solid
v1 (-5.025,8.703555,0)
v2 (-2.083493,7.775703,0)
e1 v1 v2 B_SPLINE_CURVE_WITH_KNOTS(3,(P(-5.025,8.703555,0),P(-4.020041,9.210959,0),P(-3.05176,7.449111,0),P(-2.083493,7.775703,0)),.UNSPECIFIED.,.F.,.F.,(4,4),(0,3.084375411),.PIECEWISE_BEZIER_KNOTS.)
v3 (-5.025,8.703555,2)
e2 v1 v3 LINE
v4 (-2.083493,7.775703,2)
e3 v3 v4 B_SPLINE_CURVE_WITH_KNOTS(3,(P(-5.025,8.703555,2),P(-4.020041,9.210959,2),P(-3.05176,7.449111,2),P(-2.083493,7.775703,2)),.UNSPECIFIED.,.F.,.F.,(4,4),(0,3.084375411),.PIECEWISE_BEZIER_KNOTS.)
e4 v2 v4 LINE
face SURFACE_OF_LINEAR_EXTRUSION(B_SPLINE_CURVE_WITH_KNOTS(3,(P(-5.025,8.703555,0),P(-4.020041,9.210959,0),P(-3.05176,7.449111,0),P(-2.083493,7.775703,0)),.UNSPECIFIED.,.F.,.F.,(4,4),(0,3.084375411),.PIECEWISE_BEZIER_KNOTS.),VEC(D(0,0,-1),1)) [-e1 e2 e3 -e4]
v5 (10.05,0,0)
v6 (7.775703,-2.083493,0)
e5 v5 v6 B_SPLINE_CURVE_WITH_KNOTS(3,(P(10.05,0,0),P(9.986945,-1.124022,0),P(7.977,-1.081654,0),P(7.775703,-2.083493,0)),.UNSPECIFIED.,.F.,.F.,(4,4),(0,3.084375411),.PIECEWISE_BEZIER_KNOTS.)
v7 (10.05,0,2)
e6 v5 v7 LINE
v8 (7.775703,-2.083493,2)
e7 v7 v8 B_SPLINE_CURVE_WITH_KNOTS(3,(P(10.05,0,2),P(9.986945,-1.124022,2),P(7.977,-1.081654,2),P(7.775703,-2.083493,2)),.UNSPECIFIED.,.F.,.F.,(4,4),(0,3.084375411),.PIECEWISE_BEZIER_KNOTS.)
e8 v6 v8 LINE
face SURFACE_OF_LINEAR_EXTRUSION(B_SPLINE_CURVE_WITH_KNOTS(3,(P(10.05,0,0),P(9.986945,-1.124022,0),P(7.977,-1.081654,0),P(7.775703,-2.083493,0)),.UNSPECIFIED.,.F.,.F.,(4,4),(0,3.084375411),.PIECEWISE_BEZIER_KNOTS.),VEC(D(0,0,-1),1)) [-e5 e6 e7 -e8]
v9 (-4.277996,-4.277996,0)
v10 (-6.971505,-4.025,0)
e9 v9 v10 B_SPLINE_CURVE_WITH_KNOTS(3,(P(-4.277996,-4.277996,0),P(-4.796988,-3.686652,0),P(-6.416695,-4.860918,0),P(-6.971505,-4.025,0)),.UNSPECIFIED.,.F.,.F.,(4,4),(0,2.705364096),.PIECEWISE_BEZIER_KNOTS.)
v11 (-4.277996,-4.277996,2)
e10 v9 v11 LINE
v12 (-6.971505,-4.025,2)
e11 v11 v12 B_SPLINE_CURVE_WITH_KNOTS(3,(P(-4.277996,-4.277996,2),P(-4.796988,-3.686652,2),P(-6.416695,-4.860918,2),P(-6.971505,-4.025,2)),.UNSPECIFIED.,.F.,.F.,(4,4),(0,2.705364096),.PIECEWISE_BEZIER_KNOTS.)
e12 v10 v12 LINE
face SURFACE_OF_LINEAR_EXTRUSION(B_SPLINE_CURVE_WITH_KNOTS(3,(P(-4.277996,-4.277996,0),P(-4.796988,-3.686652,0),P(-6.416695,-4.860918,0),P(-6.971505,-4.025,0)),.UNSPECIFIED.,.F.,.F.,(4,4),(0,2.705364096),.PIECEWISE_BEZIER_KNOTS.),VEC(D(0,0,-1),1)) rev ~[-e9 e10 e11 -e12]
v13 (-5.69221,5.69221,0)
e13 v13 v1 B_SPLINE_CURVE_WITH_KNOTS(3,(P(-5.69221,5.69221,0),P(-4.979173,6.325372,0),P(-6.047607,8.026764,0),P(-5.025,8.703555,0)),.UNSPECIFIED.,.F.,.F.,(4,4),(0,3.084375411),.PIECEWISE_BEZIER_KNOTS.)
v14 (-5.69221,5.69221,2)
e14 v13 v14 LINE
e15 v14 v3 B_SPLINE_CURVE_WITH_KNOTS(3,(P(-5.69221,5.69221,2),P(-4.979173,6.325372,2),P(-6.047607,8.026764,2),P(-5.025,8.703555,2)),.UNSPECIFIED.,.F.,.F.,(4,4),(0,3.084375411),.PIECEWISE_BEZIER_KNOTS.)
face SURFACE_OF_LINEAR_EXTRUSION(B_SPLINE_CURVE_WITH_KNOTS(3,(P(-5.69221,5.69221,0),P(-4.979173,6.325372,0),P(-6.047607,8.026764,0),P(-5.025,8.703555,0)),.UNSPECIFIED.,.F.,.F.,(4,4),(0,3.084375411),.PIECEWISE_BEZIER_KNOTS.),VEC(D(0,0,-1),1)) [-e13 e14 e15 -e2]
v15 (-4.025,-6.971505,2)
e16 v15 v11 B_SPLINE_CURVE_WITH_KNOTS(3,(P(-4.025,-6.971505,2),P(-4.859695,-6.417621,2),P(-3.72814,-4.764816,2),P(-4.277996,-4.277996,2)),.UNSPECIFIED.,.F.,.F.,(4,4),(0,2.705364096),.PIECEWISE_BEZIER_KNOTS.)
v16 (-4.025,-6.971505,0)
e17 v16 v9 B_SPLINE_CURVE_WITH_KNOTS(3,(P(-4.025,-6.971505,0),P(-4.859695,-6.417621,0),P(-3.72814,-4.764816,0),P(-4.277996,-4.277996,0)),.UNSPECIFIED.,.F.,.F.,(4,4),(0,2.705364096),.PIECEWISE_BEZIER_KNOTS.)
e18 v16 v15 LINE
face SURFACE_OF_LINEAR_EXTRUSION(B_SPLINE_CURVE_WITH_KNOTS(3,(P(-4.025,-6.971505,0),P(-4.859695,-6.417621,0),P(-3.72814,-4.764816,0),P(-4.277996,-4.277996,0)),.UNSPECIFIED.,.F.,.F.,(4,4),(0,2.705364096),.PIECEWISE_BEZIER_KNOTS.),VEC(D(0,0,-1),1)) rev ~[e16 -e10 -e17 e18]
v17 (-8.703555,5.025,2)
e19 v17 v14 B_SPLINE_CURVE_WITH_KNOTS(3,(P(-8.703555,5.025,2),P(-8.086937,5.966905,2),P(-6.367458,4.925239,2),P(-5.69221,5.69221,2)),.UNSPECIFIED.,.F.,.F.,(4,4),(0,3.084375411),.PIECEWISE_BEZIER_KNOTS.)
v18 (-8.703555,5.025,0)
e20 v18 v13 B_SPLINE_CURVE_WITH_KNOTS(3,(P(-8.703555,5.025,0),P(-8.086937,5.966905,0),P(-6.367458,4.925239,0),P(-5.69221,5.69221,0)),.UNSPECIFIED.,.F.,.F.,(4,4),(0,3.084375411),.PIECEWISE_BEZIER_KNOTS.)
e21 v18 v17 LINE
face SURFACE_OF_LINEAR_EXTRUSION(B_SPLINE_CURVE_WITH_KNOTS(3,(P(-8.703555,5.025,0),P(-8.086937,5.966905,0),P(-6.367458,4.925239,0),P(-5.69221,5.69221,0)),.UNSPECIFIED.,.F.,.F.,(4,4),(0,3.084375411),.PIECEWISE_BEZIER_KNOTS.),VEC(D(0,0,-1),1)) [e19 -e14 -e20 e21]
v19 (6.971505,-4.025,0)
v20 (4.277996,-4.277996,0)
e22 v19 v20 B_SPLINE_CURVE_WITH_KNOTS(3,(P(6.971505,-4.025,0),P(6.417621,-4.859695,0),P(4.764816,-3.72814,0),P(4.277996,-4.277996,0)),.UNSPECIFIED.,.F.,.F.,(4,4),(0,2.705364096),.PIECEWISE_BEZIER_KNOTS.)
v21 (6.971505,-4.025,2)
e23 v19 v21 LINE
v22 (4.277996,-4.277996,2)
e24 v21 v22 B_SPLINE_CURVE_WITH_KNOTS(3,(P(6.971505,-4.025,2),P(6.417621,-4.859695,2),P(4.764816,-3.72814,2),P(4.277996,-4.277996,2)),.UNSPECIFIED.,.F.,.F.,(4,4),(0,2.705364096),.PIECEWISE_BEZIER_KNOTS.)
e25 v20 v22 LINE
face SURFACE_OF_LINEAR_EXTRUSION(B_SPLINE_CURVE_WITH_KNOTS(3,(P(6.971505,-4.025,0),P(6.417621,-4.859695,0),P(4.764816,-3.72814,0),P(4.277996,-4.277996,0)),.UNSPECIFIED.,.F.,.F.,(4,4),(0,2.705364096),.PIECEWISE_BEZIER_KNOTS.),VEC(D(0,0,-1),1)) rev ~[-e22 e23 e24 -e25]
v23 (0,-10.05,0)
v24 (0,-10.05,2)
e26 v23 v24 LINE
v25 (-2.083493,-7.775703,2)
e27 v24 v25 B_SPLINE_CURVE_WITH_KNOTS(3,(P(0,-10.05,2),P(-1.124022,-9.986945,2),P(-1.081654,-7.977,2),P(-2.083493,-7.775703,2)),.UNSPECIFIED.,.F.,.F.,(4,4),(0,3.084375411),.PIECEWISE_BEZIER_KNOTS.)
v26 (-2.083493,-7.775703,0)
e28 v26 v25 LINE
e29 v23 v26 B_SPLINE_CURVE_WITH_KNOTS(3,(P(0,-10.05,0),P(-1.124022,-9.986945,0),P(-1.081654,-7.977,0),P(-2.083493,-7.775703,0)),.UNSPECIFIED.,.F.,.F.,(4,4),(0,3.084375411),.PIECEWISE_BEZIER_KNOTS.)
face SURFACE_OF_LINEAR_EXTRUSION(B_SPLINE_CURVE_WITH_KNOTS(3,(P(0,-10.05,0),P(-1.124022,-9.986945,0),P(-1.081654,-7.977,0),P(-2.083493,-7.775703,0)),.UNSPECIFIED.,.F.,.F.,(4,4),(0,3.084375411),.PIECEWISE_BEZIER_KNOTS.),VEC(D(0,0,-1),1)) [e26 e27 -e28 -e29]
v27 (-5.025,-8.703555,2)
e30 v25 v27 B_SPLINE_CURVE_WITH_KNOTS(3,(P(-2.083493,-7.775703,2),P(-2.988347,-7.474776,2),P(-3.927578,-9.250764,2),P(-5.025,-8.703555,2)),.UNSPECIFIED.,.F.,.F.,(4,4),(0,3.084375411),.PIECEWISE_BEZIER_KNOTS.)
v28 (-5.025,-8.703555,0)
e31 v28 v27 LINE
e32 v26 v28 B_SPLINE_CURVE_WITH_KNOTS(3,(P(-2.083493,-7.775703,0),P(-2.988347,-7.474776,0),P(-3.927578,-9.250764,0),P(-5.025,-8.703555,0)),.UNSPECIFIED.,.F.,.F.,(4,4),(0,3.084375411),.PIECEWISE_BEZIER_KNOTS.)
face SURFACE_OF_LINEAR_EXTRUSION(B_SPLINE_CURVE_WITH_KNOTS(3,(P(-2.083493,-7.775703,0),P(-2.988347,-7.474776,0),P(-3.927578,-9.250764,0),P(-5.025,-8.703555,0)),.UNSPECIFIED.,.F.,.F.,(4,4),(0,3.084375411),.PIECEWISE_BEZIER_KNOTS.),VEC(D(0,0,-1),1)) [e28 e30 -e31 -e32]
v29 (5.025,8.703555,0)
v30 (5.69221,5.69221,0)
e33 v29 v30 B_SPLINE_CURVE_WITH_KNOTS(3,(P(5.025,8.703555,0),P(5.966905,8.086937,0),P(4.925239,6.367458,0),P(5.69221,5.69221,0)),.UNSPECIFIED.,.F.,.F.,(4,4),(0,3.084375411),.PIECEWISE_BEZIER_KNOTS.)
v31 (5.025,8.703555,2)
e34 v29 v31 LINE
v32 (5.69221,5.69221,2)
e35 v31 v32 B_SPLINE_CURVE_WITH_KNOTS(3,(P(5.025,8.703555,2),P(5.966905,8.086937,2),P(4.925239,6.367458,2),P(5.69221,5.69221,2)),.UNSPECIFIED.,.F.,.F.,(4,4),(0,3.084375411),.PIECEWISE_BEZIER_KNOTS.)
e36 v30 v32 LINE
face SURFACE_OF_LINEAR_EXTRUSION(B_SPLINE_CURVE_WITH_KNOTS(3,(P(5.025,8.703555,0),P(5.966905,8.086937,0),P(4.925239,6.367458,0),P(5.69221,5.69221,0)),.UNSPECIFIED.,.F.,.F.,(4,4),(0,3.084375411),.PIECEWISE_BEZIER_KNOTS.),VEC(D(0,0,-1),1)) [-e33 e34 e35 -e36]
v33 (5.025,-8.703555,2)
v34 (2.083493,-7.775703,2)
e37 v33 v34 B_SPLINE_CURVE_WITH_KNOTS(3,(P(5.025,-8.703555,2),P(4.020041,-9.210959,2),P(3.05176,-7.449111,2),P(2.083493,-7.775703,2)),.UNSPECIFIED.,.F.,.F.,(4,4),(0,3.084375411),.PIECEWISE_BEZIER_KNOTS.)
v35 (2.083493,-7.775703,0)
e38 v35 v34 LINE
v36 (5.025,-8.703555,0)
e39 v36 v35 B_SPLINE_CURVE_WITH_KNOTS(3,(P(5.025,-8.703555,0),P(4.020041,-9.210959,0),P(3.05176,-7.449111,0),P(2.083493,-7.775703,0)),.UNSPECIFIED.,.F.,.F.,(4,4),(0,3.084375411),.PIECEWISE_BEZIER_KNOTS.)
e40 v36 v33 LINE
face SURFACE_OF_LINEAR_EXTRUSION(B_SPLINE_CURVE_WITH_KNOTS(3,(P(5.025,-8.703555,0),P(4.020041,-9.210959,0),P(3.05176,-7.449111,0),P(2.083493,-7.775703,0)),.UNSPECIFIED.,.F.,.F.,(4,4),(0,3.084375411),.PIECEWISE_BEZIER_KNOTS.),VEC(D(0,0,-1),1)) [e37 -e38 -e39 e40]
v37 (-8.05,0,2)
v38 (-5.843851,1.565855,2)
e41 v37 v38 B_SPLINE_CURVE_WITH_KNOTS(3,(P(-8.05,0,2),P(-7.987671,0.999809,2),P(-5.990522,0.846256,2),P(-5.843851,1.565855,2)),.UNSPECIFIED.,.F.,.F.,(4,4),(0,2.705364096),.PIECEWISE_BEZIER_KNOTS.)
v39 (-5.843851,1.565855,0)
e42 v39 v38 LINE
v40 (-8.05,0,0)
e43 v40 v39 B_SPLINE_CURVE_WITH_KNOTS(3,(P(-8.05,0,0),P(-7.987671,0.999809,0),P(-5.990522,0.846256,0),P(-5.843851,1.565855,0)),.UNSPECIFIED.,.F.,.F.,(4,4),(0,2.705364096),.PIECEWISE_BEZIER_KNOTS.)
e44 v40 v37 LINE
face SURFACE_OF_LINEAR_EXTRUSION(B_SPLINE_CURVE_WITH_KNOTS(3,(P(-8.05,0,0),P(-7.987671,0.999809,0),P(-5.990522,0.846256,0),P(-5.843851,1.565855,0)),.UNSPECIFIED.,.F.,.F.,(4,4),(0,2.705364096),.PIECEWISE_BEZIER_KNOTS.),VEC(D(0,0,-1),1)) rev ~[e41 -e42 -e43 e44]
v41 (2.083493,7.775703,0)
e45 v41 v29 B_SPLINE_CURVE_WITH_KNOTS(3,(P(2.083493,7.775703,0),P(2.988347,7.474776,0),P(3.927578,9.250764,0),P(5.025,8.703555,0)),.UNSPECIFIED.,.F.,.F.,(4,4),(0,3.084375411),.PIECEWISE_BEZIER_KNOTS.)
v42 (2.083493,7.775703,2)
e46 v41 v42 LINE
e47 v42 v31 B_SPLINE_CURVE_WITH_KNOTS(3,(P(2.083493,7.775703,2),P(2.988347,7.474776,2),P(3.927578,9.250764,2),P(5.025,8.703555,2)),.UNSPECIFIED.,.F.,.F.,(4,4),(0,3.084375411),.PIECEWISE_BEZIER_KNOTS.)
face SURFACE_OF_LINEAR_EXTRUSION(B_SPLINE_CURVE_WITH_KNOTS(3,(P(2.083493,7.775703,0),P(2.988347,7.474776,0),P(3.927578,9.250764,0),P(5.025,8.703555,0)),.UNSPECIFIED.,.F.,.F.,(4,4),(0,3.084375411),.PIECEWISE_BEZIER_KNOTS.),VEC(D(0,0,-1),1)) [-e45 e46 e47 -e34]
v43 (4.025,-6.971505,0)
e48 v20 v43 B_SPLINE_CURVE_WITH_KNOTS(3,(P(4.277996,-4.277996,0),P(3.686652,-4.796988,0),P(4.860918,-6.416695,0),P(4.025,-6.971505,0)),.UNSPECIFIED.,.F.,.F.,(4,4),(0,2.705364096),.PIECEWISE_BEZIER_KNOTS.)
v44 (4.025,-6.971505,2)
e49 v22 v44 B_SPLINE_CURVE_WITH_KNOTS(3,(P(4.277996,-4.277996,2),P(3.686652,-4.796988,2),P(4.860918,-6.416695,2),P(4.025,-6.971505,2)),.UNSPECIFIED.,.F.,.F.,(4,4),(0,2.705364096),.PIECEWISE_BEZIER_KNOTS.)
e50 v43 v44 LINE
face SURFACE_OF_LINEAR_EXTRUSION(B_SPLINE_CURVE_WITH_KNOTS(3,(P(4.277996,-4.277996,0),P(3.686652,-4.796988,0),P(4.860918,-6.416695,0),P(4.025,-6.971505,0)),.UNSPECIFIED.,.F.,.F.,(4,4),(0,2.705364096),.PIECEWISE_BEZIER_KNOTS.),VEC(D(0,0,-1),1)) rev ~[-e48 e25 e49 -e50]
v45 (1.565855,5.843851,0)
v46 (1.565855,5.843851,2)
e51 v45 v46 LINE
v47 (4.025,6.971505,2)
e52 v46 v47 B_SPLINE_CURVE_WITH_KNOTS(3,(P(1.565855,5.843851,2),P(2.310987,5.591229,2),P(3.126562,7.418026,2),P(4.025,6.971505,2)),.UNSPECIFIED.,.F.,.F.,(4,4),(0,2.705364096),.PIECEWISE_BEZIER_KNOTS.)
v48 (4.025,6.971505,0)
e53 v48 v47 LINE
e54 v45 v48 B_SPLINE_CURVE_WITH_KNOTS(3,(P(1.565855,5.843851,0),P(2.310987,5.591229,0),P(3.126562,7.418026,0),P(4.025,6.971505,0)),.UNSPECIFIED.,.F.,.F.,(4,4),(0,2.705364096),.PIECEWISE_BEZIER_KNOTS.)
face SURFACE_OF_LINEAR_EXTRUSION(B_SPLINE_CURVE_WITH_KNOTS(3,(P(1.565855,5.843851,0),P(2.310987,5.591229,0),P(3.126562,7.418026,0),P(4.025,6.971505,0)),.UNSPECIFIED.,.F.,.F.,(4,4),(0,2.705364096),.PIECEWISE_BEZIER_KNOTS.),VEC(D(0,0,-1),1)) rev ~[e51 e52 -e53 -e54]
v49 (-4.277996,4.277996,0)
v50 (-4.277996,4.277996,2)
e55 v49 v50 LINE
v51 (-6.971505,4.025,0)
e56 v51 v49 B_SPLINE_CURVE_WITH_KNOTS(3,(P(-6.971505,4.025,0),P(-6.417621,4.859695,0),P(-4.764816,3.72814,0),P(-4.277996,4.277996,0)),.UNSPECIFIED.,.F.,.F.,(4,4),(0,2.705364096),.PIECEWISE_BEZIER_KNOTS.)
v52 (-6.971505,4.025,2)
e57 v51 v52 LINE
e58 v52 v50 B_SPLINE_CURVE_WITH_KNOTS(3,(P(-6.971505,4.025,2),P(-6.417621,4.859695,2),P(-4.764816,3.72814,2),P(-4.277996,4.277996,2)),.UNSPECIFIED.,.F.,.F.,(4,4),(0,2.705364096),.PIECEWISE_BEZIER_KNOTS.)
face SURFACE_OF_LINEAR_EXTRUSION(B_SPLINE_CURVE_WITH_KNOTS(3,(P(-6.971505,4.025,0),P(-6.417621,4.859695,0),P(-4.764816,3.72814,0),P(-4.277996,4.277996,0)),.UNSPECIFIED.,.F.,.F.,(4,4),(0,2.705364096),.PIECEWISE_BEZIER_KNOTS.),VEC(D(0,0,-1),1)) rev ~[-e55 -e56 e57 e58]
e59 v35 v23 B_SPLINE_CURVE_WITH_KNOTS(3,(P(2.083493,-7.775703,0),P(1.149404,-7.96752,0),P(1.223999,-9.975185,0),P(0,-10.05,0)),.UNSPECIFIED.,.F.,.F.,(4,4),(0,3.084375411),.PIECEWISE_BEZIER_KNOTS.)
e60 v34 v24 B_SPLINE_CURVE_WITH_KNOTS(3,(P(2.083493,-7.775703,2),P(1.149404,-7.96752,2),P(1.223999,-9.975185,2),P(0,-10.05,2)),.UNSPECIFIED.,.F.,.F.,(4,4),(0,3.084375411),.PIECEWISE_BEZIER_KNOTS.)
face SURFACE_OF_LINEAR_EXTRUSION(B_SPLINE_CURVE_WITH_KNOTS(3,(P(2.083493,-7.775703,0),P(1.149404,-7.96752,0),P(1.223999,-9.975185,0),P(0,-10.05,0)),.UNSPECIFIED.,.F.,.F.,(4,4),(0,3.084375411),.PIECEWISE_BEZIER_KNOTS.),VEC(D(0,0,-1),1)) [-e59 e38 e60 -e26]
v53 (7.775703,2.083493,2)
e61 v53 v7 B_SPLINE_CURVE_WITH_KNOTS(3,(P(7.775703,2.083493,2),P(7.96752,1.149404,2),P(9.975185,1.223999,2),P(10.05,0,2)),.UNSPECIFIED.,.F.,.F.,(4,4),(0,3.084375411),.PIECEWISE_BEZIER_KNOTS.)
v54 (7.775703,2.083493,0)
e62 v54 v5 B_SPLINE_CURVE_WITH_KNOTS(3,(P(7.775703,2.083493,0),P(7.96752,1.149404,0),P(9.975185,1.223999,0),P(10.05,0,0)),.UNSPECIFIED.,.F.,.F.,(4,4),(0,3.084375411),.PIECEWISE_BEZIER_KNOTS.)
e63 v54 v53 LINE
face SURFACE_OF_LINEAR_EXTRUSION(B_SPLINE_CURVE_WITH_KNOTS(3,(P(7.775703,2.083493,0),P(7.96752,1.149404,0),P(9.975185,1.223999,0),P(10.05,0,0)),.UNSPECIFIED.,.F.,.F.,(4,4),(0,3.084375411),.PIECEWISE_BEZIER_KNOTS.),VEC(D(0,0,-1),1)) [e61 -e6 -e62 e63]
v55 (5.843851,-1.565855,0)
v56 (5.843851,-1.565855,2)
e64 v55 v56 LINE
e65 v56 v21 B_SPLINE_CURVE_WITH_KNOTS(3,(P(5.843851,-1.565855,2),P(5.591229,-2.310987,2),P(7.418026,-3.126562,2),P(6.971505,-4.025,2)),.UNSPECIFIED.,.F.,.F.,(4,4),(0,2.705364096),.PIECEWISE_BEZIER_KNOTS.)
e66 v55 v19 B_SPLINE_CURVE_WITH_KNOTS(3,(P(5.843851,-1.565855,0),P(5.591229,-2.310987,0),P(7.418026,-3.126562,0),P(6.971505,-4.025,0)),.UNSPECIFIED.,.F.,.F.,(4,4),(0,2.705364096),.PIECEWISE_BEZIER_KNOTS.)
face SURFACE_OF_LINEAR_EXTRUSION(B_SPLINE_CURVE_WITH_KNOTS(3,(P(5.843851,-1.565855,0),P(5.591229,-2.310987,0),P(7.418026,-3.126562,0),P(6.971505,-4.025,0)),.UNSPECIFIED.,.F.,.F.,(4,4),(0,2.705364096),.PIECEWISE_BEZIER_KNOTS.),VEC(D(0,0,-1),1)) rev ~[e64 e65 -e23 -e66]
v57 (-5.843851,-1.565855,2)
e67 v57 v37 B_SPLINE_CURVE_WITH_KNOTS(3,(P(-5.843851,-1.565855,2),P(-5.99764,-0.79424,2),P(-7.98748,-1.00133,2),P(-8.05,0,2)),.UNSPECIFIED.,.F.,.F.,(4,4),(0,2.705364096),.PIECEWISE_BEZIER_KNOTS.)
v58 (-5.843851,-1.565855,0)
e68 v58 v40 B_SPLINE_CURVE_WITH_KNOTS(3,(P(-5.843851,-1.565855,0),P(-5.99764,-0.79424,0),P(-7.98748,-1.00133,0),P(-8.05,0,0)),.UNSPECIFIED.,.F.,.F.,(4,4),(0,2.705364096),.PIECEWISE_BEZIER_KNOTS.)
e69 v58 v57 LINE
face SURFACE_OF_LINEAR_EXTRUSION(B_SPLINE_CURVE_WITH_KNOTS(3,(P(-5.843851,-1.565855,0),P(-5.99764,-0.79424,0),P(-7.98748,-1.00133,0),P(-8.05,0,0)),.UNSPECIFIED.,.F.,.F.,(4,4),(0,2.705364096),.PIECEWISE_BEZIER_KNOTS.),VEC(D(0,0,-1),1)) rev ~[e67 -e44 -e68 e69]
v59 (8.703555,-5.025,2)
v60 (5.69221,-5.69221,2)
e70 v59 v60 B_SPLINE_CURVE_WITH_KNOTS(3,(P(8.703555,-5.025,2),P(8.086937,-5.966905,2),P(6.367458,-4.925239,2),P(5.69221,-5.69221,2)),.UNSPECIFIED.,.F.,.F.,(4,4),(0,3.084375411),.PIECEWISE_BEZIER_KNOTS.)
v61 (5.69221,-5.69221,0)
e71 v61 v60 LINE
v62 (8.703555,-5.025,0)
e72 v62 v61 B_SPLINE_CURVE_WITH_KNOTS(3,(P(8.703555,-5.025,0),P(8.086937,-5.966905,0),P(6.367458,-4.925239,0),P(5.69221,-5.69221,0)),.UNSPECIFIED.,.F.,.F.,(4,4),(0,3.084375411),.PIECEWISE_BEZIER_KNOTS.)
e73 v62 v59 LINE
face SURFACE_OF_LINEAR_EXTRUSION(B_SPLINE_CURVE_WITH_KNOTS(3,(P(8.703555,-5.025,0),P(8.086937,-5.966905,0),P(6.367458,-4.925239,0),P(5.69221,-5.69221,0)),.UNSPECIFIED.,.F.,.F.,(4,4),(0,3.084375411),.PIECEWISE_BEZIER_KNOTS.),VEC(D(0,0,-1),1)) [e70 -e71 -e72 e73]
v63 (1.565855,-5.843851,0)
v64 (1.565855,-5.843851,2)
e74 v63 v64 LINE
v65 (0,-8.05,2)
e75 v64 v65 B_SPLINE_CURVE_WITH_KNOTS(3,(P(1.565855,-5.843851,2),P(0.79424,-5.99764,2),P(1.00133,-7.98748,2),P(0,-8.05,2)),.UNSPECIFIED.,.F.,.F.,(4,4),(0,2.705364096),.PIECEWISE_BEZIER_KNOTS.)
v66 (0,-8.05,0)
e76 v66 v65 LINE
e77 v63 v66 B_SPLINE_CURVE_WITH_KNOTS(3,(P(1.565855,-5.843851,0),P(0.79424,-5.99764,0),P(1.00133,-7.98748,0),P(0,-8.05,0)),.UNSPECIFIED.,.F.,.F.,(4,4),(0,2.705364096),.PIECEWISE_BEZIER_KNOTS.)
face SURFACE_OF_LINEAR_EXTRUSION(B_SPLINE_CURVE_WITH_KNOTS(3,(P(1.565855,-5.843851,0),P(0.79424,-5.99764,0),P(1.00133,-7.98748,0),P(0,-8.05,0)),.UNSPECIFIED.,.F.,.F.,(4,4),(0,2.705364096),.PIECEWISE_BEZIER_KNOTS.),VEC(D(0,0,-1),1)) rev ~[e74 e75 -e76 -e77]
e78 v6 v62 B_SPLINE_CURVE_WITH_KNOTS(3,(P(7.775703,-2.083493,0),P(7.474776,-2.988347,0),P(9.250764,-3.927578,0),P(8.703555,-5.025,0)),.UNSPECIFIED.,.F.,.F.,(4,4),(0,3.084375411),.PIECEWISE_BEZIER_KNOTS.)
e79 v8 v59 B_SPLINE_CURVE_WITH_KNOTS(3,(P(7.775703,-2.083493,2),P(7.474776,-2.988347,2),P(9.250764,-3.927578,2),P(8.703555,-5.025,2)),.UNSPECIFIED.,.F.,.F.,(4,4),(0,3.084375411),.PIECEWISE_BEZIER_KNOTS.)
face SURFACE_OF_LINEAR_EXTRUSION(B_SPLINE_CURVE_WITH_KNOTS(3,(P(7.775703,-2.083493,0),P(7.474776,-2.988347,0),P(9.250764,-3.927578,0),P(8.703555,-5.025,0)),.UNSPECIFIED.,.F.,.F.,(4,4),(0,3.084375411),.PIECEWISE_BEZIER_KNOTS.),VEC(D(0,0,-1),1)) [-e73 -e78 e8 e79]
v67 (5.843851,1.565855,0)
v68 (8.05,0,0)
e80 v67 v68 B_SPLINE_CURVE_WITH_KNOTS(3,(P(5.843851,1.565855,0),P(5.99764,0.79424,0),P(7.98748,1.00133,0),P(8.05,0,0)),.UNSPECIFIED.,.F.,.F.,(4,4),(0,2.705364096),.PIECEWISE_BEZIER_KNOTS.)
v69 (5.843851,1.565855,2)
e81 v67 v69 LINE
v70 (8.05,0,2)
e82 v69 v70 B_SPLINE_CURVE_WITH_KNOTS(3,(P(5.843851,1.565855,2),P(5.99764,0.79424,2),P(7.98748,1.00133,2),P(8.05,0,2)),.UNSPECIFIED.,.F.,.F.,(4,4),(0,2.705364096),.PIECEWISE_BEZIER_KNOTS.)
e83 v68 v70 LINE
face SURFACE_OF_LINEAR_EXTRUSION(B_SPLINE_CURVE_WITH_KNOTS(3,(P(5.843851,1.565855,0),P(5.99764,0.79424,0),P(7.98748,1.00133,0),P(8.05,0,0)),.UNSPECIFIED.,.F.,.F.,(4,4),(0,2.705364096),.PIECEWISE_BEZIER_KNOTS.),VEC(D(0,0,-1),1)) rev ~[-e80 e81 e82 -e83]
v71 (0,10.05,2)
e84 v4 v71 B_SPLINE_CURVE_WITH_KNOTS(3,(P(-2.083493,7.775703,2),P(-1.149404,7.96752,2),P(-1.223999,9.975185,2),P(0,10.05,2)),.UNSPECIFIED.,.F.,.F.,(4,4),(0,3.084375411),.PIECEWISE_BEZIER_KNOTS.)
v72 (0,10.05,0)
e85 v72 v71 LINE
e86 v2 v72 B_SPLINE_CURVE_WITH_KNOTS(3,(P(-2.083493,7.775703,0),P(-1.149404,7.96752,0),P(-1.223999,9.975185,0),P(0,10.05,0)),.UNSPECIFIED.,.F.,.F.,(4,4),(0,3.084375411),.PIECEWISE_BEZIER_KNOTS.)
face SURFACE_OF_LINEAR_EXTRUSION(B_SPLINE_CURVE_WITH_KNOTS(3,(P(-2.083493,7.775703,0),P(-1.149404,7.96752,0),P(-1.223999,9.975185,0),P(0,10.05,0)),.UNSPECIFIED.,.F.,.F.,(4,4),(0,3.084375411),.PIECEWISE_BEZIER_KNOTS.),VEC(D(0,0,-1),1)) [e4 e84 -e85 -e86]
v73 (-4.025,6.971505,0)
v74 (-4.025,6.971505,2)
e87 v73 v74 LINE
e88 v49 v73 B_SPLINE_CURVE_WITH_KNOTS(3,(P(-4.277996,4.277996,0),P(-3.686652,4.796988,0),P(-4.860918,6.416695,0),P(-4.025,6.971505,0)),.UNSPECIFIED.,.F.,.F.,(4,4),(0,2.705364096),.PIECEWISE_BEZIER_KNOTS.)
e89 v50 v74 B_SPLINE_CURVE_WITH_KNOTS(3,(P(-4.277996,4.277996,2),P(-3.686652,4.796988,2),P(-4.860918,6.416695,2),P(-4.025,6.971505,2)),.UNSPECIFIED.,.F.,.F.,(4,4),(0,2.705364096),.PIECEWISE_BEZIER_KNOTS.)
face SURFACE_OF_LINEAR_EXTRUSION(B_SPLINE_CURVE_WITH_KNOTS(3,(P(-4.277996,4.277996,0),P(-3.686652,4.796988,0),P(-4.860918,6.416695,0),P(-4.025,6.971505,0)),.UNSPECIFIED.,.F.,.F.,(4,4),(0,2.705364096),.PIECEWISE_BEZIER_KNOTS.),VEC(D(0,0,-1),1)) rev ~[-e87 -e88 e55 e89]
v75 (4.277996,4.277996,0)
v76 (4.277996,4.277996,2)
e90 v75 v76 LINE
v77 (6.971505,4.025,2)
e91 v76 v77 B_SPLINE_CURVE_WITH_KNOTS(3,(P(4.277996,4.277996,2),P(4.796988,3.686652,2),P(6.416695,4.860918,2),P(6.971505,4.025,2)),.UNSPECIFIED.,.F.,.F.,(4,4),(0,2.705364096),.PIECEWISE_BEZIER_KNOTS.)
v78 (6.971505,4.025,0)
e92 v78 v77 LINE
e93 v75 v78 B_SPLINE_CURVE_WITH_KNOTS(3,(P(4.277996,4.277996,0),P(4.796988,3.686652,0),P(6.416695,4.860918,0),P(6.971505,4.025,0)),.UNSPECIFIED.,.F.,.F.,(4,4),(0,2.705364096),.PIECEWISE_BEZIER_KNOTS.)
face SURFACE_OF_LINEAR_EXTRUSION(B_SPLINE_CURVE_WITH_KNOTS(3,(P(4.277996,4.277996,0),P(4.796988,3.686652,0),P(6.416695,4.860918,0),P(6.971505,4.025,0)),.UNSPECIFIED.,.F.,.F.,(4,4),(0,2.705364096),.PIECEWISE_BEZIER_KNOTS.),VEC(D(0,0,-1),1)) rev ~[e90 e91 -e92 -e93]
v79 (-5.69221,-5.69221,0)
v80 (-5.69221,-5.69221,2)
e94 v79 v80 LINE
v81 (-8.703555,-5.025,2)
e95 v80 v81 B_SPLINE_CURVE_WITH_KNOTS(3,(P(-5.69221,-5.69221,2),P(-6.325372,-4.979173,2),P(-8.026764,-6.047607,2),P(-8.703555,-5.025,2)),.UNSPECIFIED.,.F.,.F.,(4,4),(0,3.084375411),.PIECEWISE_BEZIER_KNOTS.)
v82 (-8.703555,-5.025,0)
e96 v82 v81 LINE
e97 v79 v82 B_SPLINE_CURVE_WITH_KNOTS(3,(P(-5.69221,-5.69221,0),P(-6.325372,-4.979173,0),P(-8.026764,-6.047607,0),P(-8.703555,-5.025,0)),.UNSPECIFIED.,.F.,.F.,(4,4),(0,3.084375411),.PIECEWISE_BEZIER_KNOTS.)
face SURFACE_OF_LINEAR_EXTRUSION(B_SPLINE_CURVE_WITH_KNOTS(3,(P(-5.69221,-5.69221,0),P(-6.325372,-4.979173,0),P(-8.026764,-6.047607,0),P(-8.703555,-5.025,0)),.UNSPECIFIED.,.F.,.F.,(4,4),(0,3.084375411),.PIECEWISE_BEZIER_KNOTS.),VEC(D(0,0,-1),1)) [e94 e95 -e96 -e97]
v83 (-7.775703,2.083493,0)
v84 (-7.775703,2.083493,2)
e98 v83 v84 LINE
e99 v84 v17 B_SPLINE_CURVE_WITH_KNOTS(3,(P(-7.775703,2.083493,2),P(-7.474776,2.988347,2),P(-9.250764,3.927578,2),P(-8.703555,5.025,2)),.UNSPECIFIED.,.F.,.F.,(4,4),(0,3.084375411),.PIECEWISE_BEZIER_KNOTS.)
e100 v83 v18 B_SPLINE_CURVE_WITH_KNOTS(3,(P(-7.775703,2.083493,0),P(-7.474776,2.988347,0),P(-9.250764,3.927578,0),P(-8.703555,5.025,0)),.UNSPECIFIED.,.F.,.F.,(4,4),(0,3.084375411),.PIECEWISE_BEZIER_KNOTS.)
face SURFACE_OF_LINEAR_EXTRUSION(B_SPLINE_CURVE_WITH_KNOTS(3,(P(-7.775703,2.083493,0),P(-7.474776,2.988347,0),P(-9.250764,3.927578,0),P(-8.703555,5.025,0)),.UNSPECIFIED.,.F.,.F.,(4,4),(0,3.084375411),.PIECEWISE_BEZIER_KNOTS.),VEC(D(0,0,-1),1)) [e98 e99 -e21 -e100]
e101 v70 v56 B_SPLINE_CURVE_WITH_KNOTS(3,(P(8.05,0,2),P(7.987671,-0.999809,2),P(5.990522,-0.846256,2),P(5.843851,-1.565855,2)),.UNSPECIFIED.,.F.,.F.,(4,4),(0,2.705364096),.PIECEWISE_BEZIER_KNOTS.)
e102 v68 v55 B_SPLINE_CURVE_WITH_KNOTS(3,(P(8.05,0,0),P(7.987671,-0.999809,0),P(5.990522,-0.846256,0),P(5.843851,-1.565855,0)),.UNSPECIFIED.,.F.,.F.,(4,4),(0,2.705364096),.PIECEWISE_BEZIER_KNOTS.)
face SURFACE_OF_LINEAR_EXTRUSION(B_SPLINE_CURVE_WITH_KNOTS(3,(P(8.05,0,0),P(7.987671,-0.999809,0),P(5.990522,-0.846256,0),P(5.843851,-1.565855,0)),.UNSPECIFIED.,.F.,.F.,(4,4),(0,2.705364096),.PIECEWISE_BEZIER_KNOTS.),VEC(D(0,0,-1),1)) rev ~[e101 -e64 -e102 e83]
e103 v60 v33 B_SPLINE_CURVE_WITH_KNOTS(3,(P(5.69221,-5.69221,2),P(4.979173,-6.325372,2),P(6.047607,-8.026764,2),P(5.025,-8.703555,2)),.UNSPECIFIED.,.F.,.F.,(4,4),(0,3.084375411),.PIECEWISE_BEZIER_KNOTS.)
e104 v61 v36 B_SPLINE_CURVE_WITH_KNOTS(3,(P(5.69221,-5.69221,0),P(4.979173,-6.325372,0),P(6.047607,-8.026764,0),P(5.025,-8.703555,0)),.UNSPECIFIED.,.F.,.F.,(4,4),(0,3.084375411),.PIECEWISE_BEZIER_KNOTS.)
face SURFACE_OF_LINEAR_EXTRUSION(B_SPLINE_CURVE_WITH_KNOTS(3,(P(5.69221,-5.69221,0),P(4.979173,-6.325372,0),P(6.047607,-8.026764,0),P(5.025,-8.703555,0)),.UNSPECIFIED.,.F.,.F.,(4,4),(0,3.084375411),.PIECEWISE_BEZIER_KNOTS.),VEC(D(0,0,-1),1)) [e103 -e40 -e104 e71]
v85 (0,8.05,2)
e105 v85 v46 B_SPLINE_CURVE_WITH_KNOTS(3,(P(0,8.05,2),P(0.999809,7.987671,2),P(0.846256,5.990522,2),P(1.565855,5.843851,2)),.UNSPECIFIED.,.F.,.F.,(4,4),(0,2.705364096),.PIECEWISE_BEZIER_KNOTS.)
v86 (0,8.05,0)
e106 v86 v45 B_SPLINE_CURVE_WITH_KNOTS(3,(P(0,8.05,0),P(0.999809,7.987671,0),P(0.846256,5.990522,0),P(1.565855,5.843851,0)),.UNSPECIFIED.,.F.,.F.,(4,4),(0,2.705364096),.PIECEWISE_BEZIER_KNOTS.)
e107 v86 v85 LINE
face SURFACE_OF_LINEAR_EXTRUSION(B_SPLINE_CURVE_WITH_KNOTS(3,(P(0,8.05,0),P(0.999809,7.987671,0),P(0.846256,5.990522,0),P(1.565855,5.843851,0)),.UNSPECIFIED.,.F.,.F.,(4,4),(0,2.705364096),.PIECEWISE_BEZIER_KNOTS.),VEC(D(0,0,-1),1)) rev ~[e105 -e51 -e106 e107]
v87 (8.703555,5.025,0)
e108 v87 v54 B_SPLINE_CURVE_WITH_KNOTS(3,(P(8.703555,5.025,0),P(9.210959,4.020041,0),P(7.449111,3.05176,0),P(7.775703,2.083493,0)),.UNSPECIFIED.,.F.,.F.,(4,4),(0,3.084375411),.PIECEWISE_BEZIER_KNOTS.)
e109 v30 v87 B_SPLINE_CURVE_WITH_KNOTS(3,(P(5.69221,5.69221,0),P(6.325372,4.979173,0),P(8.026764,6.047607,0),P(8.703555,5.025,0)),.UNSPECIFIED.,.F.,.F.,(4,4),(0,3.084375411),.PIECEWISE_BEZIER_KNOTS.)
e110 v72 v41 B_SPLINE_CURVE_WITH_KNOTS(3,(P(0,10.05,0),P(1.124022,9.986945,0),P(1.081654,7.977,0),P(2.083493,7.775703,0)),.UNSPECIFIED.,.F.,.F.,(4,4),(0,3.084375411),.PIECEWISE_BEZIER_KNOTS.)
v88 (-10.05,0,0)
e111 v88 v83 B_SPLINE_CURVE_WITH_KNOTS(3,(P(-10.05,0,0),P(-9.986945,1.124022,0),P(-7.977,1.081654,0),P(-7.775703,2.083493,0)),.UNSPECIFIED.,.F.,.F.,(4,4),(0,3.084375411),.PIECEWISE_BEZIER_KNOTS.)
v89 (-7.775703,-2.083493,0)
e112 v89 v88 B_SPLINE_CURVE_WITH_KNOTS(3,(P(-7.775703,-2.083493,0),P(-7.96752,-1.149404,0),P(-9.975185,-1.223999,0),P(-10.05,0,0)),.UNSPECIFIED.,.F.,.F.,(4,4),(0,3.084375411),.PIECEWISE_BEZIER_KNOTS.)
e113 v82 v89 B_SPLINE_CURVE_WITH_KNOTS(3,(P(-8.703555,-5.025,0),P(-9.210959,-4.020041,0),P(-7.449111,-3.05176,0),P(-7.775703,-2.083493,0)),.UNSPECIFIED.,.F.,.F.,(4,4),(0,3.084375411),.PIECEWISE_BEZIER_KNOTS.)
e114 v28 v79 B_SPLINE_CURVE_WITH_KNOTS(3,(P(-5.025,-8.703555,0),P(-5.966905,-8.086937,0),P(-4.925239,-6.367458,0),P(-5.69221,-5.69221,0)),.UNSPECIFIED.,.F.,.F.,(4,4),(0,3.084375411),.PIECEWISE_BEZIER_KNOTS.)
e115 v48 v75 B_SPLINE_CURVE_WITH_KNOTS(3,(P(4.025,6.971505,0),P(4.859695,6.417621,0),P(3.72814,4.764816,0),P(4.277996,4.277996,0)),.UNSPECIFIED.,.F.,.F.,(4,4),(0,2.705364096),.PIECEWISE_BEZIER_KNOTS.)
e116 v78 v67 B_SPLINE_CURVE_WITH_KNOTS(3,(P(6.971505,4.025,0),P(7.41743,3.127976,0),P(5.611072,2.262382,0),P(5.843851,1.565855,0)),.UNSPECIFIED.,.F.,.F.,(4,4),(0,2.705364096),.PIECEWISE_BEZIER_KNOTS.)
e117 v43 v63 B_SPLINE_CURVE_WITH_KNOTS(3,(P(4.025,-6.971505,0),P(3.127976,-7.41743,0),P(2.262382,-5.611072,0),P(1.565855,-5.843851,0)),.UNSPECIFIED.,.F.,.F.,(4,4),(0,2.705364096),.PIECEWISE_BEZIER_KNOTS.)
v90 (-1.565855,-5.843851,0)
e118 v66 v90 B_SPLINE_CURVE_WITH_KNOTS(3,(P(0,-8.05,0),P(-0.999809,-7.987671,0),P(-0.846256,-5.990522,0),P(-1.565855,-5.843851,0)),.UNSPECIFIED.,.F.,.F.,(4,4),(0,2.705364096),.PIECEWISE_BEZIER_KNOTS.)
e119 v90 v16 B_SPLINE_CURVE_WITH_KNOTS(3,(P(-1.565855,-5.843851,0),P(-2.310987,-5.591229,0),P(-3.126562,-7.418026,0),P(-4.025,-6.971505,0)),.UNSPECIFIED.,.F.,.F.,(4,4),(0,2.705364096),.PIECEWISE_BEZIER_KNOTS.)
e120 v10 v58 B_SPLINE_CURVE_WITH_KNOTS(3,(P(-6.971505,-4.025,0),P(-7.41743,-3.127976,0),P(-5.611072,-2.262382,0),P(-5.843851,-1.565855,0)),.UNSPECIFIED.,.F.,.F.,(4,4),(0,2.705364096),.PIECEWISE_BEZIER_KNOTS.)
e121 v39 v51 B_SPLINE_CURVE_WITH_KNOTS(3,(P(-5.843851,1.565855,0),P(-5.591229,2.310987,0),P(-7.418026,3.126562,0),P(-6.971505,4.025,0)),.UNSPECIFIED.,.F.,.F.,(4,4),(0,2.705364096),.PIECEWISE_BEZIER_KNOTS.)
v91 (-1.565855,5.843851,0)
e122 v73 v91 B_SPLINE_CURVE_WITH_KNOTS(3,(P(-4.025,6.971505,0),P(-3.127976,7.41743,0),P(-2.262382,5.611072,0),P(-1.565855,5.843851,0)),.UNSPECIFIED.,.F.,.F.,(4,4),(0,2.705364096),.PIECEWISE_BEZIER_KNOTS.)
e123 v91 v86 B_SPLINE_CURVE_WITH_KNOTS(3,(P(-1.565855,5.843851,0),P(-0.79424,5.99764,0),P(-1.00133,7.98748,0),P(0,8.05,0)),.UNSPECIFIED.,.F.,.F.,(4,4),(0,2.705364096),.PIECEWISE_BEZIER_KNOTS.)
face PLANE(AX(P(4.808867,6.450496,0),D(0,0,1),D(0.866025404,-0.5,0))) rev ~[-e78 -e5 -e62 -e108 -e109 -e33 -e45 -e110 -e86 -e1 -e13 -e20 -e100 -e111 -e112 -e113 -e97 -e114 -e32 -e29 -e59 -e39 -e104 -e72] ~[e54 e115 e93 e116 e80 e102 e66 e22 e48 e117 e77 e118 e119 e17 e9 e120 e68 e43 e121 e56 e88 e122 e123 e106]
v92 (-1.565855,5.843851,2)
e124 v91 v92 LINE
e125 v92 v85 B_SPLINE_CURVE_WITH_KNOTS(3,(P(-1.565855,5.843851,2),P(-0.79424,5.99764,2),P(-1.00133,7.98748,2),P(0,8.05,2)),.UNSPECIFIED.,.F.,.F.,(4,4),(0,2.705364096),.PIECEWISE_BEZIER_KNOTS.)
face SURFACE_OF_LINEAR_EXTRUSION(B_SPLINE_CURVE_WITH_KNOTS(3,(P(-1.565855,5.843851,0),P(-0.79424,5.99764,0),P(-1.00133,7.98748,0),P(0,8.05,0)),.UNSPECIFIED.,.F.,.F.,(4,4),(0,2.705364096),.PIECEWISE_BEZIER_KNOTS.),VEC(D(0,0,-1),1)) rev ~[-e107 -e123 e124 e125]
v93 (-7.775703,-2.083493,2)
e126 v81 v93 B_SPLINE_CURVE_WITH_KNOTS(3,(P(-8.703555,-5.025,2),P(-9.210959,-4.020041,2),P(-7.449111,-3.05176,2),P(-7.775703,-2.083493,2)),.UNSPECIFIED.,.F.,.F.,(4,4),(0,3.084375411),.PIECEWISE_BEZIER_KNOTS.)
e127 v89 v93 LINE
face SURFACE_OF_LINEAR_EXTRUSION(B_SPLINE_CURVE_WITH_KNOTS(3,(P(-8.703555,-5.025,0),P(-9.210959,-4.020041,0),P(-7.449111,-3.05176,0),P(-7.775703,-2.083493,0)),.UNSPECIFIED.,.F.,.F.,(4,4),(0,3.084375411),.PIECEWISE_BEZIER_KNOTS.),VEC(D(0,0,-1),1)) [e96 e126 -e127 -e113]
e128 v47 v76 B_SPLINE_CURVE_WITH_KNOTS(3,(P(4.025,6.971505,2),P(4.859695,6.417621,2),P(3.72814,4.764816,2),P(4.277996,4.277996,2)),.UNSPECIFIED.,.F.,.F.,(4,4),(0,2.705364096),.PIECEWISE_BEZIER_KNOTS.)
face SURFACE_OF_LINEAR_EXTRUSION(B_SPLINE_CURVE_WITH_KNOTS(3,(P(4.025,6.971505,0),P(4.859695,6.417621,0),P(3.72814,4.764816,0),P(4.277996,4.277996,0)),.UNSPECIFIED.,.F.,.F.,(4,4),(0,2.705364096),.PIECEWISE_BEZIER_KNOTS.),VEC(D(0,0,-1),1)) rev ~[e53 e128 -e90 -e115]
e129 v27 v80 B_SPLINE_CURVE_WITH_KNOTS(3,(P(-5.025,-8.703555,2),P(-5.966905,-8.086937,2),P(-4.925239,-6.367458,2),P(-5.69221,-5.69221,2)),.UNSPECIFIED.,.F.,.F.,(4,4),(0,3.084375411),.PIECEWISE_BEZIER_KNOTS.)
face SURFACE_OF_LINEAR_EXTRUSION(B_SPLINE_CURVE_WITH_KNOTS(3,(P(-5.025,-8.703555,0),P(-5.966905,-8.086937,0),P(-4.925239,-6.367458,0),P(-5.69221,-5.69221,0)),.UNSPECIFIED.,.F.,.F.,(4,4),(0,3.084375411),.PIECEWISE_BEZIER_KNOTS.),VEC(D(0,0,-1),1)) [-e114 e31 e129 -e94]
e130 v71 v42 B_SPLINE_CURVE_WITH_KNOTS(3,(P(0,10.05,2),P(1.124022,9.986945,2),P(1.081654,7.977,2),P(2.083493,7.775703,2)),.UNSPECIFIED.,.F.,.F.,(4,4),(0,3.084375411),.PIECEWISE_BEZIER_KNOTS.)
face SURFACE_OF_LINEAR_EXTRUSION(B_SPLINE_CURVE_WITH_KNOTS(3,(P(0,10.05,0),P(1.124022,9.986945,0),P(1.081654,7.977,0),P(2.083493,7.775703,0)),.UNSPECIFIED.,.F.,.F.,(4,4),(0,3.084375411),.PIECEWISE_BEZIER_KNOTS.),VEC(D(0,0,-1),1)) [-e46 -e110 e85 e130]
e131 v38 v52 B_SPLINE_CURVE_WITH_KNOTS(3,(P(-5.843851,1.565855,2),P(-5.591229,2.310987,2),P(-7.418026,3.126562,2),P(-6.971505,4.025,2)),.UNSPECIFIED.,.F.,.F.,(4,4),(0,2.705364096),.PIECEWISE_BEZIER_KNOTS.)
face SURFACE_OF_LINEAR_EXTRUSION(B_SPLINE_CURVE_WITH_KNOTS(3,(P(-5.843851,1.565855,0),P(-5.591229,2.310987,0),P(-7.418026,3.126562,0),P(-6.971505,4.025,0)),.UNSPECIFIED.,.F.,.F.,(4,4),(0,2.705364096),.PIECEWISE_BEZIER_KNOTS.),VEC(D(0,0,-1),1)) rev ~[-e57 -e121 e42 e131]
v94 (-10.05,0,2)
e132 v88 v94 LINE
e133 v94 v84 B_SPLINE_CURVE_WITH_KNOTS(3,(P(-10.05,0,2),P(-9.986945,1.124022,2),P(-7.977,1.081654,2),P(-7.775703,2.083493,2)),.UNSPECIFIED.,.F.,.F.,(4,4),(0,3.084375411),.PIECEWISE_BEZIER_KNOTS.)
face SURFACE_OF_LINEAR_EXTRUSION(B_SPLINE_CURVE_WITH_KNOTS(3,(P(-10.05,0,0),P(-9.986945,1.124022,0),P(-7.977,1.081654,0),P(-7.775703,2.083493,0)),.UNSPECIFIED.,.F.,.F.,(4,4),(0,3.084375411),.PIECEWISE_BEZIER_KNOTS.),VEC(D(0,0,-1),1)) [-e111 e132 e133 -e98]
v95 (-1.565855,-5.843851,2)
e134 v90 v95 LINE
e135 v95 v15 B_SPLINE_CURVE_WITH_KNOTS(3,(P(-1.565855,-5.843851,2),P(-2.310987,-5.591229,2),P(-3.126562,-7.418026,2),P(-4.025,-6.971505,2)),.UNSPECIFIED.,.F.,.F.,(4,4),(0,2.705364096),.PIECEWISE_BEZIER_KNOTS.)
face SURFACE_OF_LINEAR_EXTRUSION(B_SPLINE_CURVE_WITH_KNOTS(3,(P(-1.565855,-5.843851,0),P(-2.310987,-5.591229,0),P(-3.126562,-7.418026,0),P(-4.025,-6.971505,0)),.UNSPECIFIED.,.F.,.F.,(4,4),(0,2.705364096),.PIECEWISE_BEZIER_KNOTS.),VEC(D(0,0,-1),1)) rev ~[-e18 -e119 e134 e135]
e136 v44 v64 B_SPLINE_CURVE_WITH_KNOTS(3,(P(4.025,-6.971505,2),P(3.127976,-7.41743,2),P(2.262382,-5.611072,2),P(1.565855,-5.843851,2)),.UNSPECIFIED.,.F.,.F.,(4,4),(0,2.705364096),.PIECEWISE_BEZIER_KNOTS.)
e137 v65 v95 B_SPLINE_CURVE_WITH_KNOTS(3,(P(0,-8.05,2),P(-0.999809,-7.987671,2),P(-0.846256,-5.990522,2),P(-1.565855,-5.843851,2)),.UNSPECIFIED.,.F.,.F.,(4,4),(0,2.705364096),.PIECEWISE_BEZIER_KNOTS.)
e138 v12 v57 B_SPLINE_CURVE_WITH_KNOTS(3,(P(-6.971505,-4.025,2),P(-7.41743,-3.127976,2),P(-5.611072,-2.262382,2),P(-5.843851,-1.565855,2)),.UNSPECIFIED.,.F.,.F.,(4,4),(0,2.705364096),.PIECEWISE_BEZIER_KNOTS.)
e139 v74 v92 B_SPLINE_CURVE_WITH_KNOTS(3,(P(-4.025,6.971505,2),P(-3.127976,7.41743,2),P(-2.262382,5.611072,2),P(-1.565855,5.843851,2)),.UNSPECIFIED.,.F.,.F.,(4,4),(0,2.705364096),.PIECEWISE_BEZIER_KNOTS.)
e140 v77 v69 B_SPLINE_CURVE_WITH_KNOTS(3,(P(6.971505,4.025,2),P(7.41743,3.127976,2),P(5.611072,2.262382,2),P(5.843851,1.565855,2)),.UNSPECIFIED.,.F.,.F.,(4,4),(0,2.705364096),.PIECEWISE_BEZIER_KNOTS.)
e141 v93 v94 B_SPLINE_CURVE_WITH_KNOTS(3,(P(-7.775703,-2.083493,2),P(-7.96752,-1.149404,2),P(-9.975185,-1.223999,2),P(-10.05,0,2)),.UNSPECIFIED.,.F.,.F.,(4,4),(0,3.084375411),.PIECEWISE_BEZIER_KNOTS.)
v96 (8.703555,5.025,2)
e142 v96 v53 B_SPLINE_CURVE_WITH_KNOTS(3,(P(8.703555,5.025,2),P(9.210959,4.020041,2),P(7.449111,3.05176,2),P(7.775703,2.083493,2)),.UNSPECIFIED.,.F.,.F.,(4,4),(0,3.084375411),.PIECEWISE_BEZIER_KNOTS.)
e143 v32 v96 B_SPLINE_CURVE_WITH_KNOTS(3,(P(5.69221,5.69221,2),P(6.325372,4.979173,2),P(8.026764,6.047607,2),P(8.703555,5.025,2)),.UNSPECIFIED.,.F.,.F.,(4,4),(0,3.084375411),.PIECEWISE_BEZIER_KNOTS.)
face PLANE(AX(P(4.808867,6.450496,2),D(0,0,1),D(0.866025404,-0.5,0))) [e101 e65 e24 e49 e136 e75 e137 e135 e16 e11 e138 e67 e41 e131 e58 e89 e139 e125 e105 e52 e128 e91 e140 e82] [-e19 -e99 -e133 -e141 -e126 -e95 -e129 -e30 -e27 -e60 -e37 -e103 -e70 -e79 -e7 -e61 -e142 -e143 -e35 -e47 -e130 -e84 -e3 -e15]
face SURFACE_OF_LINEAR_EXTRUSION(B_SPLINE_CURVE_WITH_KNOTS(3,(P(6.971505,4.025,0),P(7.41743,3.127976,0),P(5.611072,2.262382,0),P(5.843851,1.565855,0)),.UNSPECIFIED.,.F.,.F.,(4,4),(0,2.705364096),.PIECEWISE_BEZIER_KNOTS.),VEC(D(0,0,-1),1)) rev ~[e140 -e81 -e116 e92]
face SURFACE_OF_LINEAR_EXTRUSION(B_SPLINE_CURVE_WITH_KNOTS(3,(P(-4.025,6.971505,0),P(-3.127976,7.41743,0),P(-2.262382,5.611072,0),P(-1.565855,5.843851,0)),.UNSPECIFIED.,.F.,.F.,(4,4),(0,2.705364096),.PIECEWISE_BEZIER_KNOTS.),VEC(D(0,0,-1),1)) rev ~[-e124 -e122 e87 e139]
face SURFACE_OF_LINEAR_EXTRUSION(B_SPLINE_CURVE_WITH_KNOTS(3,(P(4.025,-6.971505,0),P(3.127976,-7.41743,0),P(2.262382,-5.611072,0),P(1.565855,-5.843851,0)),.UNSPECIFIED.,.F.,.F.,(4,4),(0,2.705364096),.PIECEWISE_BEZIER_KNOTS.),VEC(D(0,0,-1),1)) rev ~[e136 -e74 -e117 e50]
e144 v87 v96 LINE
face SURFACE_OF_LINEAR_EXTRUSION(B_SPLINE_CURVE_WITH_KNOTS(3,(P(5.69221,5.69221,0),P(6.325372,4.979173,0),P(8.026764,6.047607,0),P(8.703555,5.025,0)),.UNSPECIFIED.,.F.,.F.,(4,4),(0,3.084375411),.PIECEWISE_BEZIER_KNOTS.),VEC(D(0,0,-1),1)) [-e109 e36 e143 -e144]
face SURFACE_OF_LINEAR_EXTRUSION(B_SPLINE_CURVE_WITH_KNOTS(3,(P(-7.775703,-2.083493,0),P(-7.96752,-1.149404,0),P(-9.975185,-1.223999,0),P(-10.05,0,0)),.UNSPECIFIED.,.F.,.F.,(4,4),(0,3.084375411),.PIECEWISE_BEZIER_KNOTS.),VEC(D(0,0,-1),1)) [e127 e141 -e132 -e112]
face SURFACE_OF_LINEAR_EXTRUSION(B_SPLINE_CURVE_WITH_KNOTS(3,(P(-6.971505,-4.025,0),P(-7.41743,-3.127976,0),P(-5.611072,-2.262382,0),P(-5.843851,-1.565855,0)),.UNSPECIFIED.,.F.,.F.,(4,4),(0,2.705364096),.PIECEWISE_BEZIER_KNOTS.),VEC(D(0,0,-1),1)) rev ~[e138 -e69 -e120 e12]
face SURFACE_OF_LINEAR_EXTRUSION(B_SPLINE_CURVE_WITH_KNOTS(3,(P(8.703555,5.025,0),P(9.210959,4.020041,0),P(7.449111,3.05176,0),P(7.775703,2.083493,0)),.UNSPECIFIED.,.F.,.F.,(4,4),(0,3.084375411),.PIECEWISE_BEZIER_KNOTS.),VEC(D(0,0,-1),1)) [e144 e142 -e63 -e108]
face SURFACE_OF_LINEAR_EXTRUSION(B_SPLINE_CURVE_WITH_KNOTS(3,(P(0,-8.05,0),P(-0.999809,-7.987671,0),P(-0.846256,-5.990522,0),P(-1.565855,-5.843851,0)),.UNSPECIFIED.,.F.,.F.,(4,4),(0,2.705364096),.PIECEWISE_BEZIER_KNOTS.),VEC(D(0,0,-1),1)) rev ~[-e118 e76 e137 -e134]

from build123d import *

# Parameters (mm, degrees)
F1_DEPTH        = 2
F1_COPIES_COUNT = 12


# Not quite as in the source:
# - a pattern or mirror of a feature is missing from the dataset's text; its kind, count and spacing are read off the source's solid


with BuildPart() as f1:
    # F0 (on Top) → F1 (new body)
    with BuildSketch(Plane.XY):
        with BuildLine():
            Line((0, 10.05), (0, 8.05))
            add(Edge.make_bspline(
                [(0, 8.05), (0.9998087881, 7.9876706484), (0.8462557502, 5.9905217807), (1.5658552229, 5.843851249)],
                knots=[0, 0, 0, 0, 2.7053640957, 2.7053640957, 2.7053640957, 2.7053640957], degree=3))
            Line((1.5658552229, 5.843851249), (2.0834933131, 7.7757029016))
            add(Edge.make_bspline(
                [(0, 10.05), (1.1240223655, 9.9869451647), (1.0816536627, 7.9769997715), (2.0834933131, 7.7757029016)],
                knots=[0, 0, 0, 0, 3.0843754112, 3.0843754112, 3.0843754112, 3.0843754112], degree=3))
        make_face()
        with BuildLine():
            Line((2.0834933131, 7.7757029016), (1.5658552229, 5.843851249))
            add(Edge.make_bspline(
                [(1.5658552229, 5.843851249), (2.3109874874, 5.5912285621), (3.1265624647, 7.4180258259), (4.025, 6.9715045005)],
                knots=[0, 0, 0, 0, 2.7053640957, 2.7053640957, 2.7053640957, 2.7053640957], degree=3))
            Line((4.025, 6.9715045005), (5.025, 8.703555308))
            add(Edge.make_bspline(
                [(2.0834933131, 7.7757029016), (2.9883467514, 7.4747764979), (3.9275781821, 9.2507637319), (5.025, 8.703555308)],
                knots=[0, 0, 0, 0, 3.0843754112, 3.0843754112, 3.0843754112, 3.0843754112], degree=3))
        make_face()
    extrude(amount=F1_DEPTH)

    # F1_copies: F1 ×12 about axis
    f1_copies_axis = Axis((0, 0, 0), (0, 0, 1))


with BuildPart() as f1_1:
    add(f1.part)
    for i in range(1, F1_COPIES_COUNT):
        add(f1.part.rotate(f1_copies_axis, i * 360 / F1_COPIES_COUNT))


solid = f1_1.part
